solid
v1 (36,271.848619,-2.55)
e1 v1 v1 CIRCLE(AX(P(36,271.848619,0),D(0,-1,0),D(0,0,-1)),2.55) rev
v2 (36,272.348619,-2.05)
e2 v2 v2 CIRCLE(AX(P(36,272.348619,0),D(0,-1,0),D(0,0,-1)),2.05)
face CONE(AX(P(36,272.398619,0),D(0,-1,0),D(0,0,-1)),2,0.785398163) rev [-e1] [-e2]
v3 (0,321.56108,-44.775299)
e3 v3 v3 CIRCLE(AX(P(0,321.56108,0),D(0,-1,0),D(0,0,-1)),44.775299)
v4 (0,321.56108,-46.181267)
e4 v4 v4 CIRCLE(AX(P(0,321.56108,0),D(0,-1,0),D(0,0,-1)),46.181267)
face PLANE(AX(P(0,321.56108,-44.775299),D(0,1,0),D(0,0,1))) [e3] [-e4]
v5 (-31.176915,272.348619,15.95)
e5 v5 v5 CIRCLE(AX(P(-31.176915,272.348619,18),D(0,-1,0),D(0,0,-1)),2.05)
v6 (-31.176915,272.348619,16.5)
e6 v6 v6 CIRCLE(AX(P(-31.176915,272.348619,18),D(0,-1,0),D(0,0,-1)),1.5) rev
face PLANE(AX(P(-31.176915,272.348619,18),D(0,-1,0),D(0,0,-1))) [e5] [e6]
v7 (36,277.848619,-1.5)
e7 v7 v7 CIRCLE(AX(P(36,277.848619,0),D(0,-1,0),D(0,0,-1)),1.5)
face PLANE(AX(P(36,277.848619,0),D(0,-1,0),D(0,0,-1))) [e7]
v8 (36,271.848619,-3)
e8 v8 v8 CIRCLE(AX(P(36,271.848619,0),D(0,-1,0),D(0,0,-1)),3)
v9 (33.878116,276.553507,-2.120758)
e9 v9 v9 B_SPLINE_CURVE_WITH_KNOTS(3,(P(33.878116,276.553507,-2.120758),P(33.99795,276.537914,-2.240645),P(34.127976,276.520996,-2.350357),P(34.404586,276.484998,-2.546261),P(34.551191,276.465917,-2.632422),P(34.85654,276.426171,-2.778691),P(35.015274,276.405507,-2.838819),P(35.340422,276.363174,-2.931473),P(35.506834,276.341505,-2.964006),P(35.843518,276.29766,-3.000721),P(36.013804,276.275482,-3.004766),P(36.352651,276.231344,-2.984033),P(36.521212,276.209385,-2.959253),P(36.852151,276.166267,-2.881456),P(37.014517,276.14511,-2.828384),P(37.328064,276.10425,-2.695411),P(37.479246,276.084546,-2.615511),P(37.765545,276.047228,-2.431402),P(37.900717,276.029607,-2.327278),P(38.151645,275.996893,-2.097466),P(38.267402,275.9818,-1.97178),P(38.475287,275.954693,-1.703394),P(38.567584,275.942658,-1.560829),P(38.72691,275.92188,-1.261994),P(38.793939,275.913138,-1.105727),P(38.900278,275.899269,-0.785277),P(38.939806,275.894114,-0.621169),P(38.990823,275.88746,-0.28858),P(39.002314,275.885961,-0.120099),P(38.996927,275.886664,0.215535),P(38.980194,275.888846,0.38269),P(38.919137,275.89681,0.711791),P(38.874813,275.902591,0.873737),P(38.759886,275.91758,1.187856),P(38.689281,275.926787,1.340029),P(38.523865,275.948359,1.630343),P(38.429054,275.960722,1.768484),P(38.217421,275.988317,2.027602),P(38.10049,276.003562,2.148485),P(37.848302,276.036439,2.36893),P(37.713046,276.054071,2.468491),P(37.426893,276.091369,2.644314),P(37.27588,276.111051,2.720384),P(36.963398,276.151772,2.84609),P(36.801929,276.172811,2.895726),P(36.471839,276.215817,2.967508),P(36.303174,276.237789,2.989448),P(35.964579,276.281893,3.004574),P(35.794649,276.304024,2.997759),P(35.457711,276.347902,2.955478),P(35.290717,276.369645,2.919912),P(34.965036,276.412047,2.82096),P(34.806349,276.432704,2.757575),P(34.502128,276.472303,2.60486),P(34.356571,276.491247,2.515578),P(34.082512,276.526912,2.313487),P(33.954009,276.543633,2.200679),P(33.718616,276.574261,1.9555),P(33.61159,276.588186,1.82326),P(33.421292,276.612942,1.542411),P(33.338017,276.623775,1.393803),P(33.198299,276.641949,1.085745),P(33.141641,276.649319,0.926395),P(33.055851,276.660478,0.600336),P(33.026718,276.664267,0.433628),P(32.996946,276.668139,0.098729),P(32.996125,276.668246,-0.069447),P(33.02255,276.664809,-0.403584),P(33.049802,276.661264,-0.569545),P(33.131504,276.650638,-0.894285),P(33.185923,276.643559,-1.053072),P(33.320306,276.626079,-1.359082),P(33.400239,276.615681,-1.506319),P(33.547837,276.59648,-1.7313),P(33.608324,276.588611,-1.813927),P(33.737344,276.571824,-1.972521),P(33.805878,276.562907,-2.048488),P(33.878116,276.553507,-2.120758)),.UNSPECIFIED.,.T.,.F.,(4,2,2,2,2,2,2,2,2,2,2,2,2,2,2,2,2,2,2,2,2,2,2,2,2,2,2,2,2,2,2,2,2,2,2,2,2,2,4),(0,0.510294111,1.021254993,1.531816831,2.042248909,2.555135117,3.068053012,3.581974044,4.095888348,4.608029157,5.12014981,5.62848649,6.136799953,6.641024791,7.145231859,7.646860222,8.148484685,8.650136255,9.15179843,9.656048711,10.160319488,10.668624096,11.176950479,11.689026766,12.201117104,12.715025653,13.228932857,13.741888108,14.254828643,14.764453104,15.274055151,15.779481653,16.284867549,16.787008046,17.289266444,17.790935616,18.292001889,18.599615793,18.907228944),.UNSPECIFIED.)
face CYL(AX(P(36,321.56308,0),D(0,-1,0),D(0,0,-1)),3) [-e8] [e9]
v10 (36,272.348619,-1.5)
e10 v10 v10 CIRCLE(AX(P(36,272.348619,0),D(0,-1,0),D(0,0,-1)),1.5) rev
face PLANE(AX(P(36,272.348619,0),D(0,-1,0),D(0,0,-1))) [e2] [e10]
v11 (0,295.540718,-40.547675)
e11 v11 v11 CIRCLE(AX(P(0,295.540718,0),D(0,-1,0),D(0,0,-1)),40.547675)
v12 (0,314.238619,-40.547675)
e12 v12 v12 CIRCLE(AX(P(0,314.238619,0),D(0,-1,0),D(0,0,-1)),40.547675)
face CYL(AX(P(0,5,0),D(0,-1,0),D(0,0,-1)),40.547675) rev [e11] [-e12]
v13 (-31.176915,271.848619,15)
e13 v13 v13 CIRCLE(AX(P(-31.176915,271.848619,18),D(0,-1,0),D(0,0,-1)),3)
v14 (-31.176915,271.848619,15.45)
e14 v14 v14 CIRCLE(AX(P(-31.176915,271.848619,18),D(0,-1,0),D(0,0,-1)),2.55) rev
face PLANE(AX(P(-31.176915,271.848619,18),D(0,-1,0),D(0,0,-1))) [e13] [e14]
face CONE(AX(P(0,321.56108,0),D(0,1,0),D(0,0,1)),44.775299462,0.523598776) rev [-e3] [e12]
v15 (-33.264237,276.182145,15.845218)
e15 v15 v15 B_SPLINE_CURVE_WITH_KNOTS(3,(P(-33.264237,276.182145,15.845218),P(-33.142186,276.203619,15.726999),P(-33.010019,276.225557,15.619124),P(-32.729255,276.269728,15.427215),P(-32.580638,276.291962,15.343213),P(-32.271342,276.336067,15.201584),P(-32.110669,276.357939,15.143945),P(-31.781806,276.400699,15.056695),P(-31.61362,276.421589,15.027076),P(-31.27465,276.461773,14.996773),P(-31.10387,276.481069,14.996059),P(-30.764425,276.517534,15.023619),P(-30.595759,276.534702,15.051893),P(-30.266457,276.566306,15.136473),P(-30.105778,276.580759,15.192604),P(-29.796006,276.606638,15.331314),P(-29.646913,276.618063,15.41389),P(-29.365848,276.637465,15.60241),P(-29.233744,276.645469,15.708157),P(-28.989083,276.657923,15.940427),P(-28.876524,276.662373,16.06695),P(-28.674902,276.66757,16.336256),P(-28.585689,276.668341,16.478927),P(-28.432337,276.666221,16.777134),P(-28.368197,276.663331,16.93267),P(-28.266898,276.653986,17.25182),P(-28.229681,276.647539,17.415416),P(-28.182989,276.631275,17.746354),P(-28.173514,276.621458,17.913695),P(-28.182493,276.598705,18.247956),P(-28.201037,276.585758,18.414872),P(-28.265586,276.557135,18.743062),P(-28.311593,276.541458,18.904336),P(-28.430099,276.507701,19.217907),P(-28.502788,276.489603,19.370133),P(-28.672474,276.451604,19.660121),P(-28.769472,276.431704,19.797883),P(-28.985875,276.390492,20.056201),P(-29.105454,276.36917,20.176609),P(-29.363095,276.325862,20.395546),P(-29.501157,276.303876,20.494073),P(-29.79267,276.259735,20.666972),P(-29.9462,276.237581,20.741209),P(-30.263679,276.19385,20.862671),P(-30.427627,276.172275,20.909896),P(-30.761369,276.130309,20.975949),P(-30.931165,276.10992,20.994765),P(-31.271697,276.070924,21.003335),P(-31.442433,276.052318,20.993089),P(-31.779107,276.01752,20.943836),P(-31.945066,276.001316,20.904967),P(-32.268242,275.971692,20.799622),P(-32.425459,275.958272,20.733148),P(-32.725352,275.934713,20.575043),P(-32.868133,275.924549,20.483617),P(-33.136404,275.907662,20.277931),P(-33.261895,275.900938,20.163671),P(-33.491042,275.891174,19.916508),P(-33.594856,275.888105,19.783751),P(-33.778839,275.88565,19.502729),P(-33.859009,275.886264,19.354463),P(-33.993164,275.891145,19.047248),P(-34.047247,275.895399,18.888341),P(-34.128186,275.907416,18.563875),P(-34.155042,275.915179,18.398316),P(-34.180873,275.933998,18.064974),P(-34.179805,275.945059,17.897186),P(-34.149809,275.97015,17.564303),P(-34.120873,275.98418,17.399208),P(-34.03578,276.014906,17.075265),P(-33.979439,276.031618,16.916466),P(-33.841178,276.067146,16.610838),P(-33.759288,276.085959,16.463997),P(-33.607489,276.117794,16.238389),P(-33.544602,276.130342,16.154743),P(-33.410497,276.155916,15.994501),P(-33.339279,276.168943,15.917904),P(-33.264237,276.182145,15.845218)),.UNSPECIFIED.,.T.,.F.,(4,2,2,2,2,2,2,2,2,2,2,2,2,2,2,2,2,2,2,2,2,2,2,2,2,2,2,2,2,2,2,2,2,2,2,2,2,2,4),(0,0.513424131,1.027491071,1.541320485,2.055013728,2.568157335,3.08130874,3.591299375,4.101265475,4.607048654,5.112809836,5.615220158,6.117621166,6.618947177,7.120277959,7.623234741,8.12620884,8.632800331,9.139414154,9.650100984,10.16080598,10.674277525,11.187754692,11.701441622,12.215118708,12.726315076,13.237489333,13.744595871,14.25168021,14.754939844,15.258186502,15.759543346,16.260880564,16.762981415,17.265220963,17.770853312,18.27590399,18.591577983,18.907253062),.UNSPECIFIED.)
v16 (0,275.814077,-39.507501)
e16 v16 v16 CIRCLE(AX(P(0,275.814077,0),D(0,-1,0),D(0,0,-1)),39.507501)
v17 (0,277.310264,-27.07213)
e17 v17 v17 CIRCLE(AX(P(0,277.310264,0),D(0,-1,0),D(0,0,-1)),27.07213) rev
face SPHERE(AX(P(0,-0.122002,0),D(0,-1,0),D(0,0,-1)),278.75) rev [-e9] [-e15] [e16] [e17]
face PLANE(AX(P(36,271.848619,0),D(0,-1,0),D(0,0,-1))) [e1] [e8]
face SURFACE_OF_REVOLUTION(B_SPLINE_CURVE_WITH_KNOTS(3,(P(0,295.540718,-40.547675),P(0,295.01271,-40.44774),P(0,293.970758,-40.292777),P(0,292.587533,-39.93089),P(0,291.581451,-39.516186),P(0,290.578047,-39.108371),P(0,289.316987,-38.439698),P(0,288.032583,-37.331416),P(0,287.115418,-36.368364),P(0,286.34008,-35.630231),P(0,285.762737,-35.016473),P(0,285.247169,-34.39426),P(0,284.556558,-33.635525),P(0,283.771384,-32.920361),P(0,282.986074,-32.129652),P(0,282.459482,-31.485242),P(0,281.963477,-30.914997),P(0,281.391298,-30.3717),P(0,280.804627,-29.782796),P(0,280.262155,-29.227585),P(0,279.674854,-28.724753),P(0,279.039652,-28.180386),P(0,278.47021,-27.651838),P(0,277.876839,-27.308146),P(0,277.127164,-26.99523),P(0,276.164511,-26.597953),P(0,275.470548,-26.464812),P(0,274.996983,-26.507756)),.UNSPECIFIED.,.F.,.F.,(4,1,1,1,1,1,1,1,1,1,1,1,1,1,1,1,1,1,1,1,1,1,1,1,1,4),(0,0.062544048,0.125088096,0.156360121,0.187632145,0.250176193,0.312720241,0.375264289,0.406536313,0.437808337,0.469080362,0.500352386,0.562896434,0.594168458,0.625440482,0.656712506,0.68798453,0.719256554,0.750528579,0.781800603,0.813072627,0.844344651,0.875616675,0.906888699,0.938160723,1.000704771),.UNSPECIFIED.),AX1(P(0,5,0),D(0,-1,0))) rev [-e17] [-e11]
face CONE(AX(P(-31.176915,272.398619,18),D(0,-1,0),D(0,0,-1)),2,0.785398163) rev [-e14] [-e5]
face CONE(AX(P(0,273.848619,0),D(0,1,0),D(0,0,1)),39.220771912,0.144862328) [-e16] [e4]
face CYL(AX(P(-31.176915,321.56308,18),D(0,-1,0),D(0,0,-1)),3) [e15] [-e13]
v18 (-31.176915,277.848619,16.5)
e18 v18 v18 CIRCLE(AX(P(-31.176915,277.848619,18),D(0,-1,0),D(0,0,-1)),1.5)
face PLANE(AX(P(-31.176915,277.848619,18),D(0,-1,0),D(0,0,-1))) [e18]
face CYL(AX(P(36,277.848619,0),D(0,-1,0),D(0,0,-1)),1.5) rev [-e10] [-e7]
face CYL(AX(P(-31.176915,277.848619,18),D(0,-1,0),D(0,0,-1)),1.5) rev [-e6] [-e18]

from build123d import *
from OCP.BRepAlgoAPI import BRepAlgoAPI_Cut
from OCP.TopTools import TopTools_ListOfShape

# Parameters (mm, degrees)
SKETCH4_R                       = 3
BOSS_EXTRUDE1_DEPTH             = 2
SKETCH4_2_R                     = 3
BOSS_EXTRUDE3_DEPTH             = 2
BOSS_EXTRUDE3_DIRECTION_2_REACH = 82.882
SKETCH13_R                      = 1.5
CUT_EXTRUDE1_DEPTH              = 6
SKETCH14_R                      = 2
CUT_EXTRUDE2_DEPTH              = 0.5
CHAMFER3_SIZE                   = 0.55


with BuildPart() as part:
    # Sketch2 → Revolve6 (revolve)
    with BuildSketch(Plane(origin=(0, 0, 0), x_dir=(0, 0, -1), z_dir=(1, 0, 0))):
        with BuildLine():
            Line((26.5077562, 274.996982717), (26.5077562, 273.848618937))
            Line((26.5077562, 273.848618937), (39.220771912, 273.848618937))
            Line((39.220771912, 273.848618937), (46.181267187, 321.561079724))
            Line((46.181267187, 321.561079724), (44.775299462, 321.561079724))
            Line((44.775299462, 321.561079724), (40.547674755, 314.238618937))
            Line((40.547674755, 314.238618937), (40.547674755, 295.540718438))
            add(Edge.make_bspline(
                [(40.547674755, 295.540718438), (40.447740466, 295.012709616), (40.292777353, 293.970757619), (39.930889755, 292.587532753), (39.516186416, 291.581451359), (39.108370782, 290.57804728), (38.439698054, 289.316986818), (37.331416086, 288.032583079), (36.368363881, 287.115418474), (35.630231264, 286.340079673), (35.016472726, 285.762737126), (34.394259795, 285.247169223), (33.635524662, 284.556557999), (32.920361334, 283.771384038), (32.129651901, 282.986073936), (31.485241784, 282.459482323), (30.914997208, 281.963476573), (30.371700346, 281.391298159), (29.782796159, 280.80462685), (29.227584581, 280.262154528), (28.724752618, 279.674853681), (28.180386253, 279.039651715), (27.651838315, 278.470209992), (27.308145935, 277.876839187), (26.995230081, 277.127164256), (26.597952618, 276.164510632), (26.464811583, 275.470548141), (26.5077562, 274.996982717)],
                knots=[0, 0, 0, 0, 0.062544048, 0.125088096, 0.156360121, 0.187632145, 0.250176193, 0.312720241, 0.375264289, 0.406536313, 0.437808337, 0.469080362, 0.500352386, 0.562896434, 0.594168458, 0.625440482, 0.656712506, 0.68798453, 0.719256554, 0.750528579, 0.781800603, 0.813072627, 0.844344651, 0.875616675, 0.906888699, 0.938160723, 1.000704771, 1.000704771, 1.000704771, 1.000704771], degree=3))
        make_face()
    revolve(axis=Axis((0, 5, 0), (0, 1, 0)))

    # Sketch4 → Boss-Extrude1 (add)
    with BuildSketch(Plane.XZ.offset(-273.848618937)):
        with Locations(Location((-31.176914536, 18, 0), (0, 0, 270))):
            Circle(SKETCH4_R)
        with Locations(Location((36, 0, 0), (0, 0, 270))):
            Circle(SKETCH4_R)
    extrude(amount=BOSS_EXTRUDE1_DEPTH)

    # Sketch7 → Revolve7 (revolve)
    with BuildSketch(Plane(origin=(0, 0, 0), x_dir=(0, 0, -1), z_dir=(1, 0, 0))):
        with BuildLine():
            Line((39.220771912, 273.848618937), (39.220771912, 272.319355593))
            ThreePointArc((39.220771912, 272.319355593), (32.873157949, 273.157923648), (26.5077562, 273.848618937))
            Line((26.5077562, 273.848618937), (26.5077562, 274.348618937))
            Line((26.5077562, 274.348618937), (39.220771912, 274.348618937))
            Line((39.220771912, 274.348618937), (39.220771912, 273.848618937))
        make_face()
    revolve(axis=Axis((0, 5, 0), (0, 1, 0)))


with BuildPart() as cut_revolve3_tool:
    # Sketch12 → Cut-Revolve3 (revolve)
    with BuildSketch(Plane(origin=(0, 0, 0), x_dir=(0, 0, -1), z_dir=(1, 0, 0))):
        with BuildLine():
            Line((26.0877562, 277.404557538), (26.0877562, 267.404557538))
            Line((26.0877562, 267.404557538), (40.0877562, 267.404557538))
            Line((40.0877562, 267.404557538), (40.0877562, 275.730375326))
            ThreePointArc((40.0877562, 275.730375326), (33.098343341, 276.655999187), (26.0877562, 277.404557538))
        make_face()
    revolve(axis=Axis((0, 5, 0), (0, 1, 0)))


with BuildPart() as part_1:
    add(part.part)

    # Cut-Revolve3: cut by cut_revolve3_tool, with a tolerance
    cut_revolve3_stock = TopTools_ListOfShape()
    cut_revolve3_stock.Append(part_1.part.wrapped)
    cut_revolve3_tools = TopTools_ListOfShape()
    cut_revolve3_tools.Append(cut_revolve3_tool.part.wrapped)
    cut_revolve3_cut = BRepAlgoAPI_Cut()
    cut_revolve3_cut.SetArguments(cut_revolve3_stock)
    cut_revolve3_cut.SetTools(cut_revolve3_tools)
    cut_revolve3_cut.SetFuzzyValue(0.00001)
    cut_revolve3_cut.Build()
    add(Compound.cast(cut_revolve3_cut.Shape()).solids(), mode=Mode.REPLACE)

    # Sketch4<2> → Boss-Extrude3 (add)
    with BuildSketch(Plane.XZ.offset(-273.848618937)):
        with Locations(Location((-31.176914536, 18, 0), (0, 0, 270))):
            Circle(SKETCH4_2_R)
        with Locations(Location((36, 0, 0), (0, 0, 270))):
            Circle(SKETCH4_2_R)
    extrude(amount=BOSS_EXTRUDE3_DEPTH)

    # Sketch4<2> → Boss-Extrude3 direction 2 (add, up to next)
    with BuildSketch(Plane.XZ.offset(-273.848618937), mode=Mode.PRIVATE) as boss_extrude3_direction_2_sk1:
        with Locations(Location((-31.176914536, 18, 0), (0, 0, 270))):
            Circle(SKETCH4_2_R)
    boss_extrude3_direction_2_tool1 = extrude(boss_extrude3_direction_2_sk1.sketch, amount=-BOSS_EXTRUDE3_DIRECTION_2_REACH, mode=Mode.PRIVATE) - part_1.part
    # Sketch4<2> → Boss-Extrude3 direction 2 (add, up to next)
    with BuildSketch(Plane.XZ.offset(-273.848618937), mode=Mode.PRIVATE) as boss_extrude3_direction_2_sk2:
        with Locations(Location((36, 0, 0), (0, 0, 270))):
            Circle(SKETCH4_2_R)
    boss_extrude3_direction_2_tool2 = extrude(boss_extrude3_direction_2_sk2.sketch, amount=-BOSS_EXTRUDE3_DIRECTION_2_REACH, mode=Mode.PRIVATE) - part_1.part
    add(boss_extrude3_direction_2_tool1.solids().sort_by_distance((-31.176915, 273.848619, 18))[0])
    add(boss_extrude3_direction_2_tool2.solids().sort_by_distance((36, 273.848619, 0))[0])

    # Sketch13 → Cut-Extrude1 (cut)
    with BuildSketch(Plane.XZ.offset(-271.848618937)):
        with Locations(Location((-31.176914536, 18, 0), (0, 0, 270))):
            Circle(SKETCH13_R)
        with Locations(Location((36, 0, 0), (0, 0, 270))):
            Circle(SKETCH13_R)
    extrude(amount=-CUT_EXTRUDE1_DEPTH, mode=Mode.SUBTRACT)

    # Sketch14 → Cut-Extrude2 (cut)
    with BuildSketch(Plane.XZ.offset(-271.848618937)):
        with Locations(Location((-31.176914536, 18, 0), (0, 0, 270))):
            Circle(SKETCH14_R)
        with Locations(Location((36, 0, 0), (0, 0, 270))):
            Circle(SKETCH14_R)
    extrude(amount=-CUT_EXTRUDE2_DEPTH, mode=Mode.SUBTRACT)

    # Chamfer3
    # the kernel refuses this chamfer: 0.55 mm, written as the material it takes off along each edge
    with BuildSketch(Plane(origin=(36, 271.848618937, 0), x_dir=(0, 0, -1), z_dir=(-1, 0, 0))) as chamfer3_piece_1_section:
        Polygon((2 + CHAMFER3_SIZE, 0), (2, -CHAMFER3_SIZE), (2, 0), align=None)
    chamfer3_piece_1 = revolve(axis=Axis((36, 271.848618937, 0), (0, -1, 0)), mode=Mode.PRIVATE)
    chamfer3_piece_1 = split(chamfer3_piece_1, bisect_by=Plane(origin=(36, 272.348618937, 0), z_dir=(0, -1, 0)), keep=Keep.TOP, mode=Mode.PRIVATE)
    add(chamfer3_piece_1, mode=Mode.SUBTRACT)
    with BuildSketch(Plane(origin=(-31.176914536, 271.848618937, 18), x_dir=(0, 0, -1), z_dir=(-1, 0, 0))) as chamfer3_piece_2_section:
        Polygon((2 + CHAMFER3_SIZE, 0), (2, -CHAMFER3_SIZE), (2, 0), align=None)
    chamfer3_piece_2 = revolve(axis=Axis((-31.176914536, 271.848618937, 18), (0, -1, 0)), mode=Mode.PRIVATE)
    chamfer3_piece_2 = split(chamfer3_piece_2, bisect_by=Plane(origin=(-31.176914536, 272.348618937, 18), z_dir=(0, -1, 0)), keep=Keep.TOP, mode=Mode.PRIVATE)
    add(chamfer3_piece_2, mode=Mode.SUBTRACT)


solid = part_1.part
